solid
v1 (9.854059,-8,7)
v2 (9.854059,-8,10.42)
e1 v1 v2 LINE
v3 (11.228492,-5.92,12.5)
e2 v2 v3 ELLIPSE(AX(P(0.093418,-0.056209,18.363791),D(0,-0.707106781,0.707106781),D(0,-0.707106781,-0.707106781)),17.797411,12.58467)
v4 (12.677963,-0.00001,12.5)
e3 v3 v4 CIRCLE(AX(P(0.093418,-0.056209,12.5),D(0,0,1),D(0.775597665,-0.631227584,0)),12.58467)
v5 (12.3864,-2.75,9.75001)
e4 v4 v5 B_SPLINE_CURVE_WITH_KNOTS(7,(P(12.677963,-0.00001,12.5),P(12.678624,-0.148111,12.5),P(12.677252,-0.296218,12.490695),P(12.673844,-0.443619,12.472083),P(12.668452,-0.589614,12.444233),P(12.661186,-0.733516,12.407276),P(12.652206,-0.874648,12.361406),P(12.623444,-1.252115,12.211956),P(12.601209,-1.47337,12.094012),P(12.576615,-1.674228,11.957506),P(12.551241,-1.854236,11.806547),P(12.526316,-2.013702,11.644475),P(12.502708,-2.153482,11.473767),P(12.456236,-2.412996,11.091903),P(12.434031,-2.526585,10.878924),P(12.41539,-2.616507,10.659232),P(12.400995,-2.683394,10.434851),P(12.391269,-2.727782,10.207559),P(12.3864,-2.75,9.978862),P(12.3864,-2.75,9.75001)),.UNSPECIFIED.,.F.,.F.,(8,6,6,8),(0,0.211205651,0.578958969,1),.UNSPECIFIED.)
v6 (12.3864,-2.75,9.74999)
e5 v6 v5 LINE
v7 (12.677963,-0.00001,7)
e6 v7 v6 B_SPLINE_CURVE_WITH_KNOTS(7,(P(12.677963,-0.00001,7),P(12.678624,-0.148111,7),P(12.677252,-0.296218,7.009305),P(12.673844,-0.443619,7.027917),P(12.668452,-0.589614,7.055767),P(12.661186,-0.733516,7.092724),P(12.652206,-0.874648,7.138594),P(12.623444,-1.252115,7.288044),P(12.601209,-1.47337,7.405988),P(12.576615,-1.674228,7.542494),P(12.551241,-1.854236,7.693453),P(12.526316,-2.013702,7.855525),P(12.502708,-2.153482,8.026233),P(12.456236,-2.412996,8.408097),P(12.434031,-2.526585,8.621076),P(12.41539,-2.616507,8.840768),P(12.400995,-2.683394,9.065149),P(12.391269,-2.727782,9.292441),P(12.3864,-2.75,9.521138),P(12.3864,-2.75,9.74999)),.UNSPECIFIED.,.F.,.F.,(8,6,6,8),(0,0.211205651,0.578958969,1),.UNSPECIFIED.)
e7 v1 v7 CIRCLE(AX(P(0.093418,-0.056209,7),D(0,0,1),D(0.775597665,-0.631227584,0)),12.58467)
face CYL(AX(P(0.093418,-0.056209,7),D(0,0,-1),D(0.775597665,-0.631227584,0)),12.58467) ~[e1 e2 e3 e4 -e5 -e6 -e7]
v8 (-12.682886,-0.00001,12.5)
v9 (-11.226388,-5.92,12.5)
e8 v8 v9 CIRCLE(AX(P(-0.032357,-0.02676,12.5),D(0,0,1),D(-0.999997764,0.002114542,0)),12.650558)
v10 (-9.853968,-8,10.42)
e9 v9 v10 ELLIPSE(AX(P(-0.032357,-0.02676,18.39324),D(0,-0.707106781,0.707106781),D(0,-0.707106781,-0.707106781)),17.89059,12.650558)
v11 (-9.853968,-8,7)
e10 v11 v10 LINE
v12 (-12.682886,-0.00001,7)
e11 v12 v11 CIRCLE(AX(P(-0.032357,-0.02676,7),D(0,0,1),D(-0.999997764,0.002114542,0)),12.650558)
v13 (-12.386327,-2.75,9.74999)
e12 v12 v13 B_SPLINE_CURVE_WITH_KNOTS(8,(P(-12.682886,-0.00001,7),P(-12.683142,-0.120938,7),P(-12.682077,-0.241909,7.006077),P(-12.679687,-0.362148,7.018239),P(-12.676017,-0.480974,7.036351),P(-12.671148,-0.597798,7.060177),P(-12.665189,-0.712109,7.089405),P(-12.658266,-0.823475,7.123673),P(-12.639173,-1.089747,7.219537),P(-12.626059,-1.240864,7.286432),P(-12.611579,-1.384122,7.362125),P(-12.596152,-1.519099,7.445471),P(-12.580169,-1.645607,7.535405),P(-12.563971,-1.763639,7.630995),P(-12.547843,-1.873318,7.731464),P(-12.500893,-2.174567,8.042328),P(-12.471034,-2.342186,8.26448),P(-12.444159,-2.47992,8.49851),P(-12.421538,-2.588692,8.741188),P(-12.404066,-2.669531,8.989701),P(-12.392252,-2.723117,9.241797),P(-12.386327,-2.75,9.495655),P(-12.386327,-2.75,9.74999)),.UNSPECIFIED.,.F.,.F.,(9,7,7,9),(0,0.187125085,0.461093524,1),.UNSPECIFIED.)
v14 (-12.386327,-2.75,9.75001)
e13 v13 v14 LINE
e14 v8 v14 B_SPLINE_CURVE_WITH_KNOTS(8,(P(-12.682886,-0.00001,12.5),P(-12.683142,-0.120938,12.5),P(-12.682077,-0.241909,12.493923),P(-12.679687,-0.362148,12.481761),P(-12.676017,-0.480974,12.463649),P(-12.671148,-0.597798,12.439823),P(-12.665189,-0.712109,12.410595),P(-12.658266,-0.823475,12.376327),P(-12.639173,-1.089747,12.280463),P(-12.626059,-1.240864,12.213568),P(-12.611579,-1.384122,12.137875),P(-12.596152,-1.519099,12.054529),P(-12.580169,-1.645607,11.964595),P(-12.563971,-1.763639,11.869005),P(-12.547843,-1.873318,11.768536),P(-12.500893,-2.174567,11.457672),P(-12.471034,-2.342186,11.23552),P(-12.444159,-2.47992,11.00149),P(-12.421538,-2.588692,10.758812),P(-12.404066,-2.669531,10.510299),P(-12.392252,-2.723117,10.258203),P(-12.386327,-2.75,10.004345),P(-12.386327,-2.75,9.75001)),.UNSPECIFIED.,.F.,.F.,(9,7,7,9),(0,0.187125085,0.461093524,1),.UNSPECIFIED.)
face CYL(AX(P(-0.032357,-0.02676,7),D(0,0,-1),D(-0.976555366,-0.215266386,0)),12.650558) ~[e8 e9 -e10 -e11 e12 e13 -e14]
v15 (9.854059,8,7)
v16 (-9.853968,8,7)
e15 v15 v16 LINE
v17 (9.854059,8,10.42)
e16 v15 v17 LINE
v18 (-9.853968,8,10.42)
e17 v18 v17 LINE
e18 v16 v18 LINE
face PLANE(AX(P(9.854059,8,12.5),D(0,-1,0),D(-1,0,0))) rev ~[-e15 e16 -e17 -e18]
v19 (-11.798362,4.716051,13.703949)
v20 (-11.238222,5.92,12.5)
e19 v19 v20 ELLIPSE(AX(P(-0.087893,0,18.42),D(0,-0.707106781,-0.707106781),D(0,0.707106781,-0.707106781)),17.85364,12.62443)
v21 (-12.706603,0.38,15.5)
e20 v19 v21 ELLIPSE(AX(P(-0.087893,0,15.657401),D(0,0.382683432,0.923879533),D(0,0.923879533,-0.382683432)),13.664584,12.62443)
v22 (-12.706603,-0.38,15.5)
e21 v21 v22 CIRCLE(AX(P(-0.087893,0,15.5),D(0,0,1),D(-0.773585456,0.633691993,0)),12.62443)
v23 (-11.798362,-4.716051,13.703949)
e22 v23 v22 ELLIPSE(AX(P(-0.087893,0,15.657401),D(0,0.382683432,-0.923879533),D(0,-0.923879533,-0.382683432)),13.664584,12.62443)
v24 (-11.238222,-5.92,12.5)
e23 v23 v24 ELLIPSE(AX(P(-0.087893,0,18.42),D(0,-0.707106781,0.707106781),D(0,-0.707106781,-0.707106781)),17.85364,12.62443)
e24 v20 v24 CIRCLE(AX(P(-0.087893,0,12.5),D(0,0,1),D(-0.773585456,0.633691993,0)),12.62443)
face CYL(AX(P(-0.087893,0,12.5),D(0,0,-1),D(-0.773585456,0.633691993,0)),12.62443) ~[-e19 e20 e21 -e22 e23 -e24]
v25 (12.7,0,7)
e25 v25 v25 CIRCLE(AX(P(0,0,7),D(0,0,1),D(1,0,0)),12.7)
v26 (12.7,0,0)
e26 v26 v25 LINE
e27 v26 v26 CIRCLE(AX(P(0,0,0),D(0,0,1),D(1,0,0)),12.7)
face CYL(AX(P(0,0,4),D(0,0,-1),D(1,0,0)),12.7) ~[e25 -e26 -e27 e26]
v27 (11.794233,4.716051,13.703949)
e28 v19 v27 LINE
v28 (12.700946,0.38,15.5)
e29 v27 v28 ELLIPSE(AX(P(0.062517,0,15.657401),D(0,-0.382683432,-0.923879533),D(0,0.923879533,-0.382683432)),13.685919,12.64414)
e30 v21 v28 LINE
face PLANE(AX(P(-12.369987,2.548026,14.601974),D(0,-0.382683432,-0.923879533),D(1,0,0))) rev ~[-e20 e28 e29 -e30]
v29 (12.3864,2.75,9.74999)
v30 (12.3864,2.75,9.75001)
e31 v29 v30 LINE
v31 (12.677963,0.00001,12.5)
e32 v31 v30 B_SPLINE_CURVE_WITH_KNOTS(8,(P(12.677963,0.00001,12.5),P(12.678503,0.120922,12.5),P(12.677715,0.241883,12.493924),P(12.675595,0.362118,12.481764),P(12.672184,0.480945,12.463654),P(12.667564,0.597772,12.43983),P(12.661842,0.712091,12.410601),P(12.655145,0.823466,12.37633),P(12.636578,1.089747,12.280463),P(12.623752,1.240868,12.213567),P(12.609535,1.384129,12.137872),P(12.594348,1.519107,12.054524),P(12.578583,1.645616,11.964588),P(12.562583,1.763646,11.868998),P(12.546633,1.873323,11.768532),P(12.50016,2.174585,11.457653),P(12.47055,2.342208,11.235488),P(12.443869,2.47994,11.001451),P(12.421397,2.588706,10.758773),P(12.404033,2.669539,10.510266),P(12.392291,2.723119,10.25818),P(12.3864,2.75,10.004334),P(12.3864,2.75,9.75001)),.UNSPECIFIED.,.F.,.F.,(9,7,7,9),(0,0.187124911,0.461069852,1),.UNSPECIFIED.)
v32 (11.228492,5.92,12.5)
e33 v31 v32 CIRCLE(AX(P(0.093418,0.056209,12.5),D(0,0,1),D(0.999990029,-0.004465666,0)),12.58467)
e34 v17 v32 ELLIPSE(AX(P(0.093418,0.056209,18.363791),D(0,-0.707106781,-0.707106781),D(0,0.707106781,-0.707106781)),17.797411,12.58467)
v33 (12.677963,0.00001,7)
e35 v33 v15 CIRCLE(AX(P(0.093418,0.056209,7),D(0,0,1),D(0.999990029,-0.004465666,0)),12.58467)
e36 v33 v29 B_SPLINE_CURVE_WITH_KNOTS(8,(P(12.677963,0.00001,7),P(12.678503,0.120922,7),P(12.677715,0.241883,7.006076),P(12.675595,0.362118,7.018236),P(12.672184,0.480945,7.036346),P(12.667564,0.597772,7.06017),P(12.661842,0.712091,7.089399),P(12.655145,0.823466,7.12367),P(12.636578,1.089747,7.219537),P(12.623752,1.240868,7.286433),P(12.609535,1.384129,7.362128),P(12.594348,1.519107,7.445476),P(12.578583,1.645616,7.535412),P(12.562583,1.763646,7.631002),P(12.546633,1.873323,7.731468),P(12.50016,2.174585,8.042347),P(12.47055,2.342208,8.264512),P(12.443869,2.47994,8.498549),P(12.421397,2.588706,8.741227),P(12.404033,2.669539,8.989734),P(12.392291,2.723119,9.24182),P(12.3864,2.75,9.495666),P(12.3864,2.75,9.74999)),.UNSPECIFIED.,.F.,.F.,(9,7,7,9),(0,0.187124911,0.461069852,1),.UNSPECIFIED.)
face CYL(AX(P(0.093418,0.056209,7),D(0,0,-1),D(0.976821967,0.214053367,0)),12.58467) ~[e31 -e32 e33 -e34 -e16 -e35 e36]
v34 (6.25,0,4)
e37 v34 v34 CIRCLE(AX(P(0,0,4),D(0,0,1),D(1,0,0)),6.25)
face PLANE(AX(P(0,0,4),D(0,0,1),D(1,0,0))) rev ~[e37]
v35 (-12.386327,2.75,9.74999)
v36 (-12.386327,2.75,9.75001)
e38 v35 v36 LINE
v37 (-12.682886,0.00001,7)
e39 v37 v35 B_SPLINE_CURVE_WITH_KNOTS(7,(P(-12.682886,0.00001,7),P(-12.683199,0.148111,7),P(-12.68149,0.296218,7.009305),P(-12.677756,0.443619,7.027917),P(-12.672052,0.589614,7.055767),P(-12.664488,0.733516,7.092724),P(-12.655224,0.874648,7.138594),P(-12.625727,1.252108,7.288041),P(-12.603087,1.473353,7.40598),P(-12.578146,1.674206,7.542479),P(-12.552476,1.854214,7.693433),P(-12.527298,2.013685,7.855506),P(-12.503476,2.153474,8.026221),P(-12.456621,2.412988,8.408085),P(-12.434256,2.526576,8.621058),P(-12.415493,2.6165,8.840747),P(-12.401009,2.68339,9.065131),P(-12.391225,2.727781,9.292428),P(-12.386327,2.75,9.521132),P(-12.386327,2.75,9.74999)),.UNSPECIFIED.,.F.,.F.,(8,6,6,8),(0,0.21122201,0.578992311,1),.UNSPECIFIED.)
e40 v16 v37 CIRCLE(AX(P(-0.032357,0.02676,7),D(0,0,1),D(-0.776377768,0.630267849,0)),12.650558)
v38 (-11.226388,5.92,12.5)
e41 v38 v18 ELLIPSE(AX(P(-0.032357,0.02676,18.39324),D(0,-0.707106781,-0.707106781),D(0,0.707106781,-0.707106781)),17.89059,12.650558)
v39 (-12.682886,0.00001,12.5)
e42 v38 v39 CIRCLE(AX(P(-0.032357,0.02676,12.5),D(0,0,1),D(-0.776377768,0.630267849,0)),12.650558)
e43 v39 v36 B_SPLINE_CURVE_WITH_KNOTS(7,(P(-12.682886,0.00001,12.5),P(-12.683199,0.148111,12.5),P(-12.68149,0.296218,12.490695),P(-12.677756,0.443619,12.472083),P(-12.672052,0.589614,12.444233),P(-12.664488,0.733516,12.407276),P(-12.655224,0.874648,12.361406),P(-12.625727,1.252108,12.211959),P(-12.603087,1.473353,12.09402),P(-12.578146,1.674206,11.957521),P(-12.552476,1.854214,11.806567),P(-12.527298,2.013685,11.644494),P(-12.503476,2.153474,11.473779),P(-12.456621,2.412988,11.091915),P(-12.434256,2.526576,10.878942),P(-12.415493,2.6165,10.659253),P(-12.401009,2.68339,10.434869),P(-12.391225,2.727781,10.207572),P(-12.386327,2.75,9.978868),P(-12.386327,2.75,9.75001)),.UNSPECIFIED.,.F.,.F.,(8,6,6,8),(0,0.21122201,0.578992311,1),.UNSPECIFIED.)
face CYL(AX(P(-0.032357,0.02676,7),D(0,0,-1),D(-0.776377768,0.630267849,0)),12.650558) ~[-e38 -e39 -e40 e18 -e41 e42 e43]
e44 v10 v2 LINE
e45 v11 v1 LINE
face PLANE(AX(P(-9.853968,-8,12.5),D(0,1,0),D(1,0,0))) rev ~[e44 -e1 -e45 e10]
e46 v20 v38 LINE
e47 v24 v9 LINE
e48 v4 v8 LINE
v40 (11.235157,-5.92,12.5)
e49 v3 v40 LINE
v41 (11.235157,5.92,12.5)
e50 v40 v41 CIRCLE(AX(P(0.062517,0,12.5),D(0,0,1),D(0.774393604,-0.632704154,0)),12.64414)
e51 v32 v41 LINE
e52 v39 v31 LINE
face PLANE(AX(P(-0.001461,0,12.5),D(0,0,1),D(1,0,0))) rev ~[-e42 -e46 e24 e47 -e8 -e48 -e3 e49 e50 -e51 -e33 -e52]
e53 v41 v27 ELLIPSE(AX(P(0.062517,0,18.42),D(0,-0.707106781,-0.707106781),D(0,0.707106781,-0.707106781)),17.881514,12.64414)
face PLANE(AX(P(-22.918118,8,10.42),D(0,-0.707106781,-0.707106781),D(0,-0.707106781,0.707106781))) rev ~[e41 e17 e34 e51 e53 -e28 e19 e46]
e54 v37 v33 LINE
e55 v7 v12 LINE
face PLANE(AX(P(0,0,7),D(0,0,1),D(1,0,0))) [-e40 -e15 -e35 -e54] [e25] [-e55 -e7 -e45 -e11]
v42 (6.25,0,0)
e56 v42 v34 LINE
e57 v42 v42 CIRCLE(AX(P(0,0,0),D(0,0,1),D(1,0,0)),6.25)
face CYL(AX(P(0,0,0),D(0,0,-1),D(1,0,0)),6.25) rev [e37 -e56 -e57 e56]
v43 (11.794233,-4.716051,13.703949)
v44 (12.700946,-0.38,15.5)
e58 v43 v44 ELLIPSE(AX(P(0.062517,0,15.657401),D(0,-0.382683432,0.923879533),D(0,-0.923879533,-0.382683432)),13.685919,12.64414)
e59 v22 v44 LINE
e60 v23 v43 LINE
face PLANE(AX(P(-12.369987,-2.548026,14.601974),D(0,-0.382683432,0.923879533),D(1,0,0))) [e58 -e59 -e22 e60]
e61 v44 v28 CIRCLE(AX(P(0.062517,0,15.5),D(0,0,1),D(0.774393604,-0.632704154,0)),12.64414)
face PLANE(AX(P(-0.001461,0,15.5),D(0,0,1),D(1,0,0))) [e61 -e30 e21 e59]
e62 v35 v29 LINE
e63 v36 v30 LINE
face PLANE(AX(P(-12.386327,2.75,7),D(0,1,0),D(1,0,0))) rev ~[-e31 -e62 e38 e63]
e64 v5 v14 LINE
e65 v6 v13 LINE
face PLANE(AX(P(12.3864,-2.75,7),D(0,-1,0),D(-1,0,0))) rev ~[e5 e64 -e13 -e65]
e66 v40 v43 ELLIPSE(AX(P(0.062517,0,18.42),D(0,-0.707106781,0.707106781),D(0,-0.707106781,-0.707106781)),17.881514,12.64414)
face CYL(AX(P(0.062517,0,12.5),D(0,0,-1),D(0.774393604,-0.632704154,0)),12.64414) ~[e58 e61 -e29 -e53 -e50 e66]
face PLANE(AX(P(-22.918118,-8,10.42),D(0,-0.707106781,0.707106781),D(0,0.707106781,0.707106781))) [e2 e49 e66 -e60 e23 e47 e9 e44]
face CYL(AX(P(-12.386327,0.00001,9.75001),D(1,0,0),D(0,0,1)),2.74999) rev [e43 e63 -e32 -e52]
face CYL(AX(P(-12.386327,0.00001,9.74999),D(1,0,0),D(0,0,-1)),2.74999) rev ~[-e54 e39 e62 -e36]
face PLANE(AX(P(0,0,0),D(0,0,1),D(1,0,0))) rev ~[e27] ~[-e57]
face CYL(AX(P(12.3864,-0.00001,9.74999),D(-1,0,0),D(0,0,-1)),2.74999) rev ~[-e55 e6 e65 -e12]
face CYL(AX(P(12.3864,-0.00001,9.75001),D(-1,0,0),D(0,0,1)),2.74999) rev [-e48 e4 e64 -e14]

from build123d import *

# Parameters (mm, degrees)
F0_R         = 12.7
F0_R_2       = 6.25
F1_DEPTH     = 4
F3_R         = 12.7
F4_DEPTH     = 3
F7_DEPTH     = 5.5
F10_DEPTH    = 3
F11_R        = 2.74999
F12_T1_DEPTH = 45.8363262896
F13_SIZE     = 2.54


# Not quite as in the source:
# - a fillet or chamfer that OpenCascade refuses, or shapes differently, is made with other operations: its cross-section is extruded or revolved along the edge and cut away or added
# - a fillet or chamfer is up to 0.001 mm smaller than in the source, because OpenCascade refuses the exact size


with BuildPart() as f1:
    # F0 (on Top) → F1 (new body)
    with BuildSketch(Plane.XY):
        Circle(F0_R)
        Circle(F0_R_2, mode=Mode.SUBTRACT)
    extrude(amount=F1_DEPTH)

    # F3 (on offset) → F4 (join)
    with BuildSketch(Plane.XY.offset(4)):
        Circle(F3_R)
    extrude(amount=F4_DEPTH)

    # F6 (on offset) → F7 (join)
    with BuildSketch(Plane.XY.offset(7)):
        with BuildLine():
            Line((3.67872e-05, 2.75), (12.3864002526, 2.75))
            ThreePointArc((12.3864002526, 2.75), (11.4283726358, 5.5236330803), (9.8540587351, 8))
            Line((9.8540587351, 8), (-9.8539683968, 8))
            ThreePointArc((-9.8539683968, 8), (-11.4266416959, 5.5228386705), (-12.3863266781, 2.75))
            Line((-12.3863266781, 2.75), (-4.0361126885, 2.75))
            Line((-4.0361126885, 2.75), (3.67872e-05, 2.75))
        make_face()
        with BuildLine():
            Line((12.3864002526, -2.75), (3.67872e-05, -2.75))
            Line((3.67872e-05, -2.75), (-4.0361126885, -2.75))
            Line((-4.0361126885, -2.75), (-12.3863266781, -2.75))
            ThreePointArc((-12.3863266781, -2.75), (-11.4266416959, -5.5228386705), (-9.8539683968, -8))
            Line((-9.8539683968, -8), (9.8540587351, -8))
            ThreePointArc((9.8540587351, -8), (11.4283726358, -5.5236330803), (12.3864002526, -2.75))
        make_face()
    extrude(amount=F7_DEPTH)

    # F9 (on offset) → F10 (join)
    with BuildSketch(Plane.XY.offset(12.5)):
        with BuildLine():
            Line((-9.8539683968, -8), (9.8540587351, -8))
            ThreePointArc((9.8540587351, -8), (12.7066576307, 0), (9.8540587351, 8))
            Line((9.8540587351, 8), (-9.8539683968, 8))
            ThreePointArc((-9.8539683968, 8), (-12.7123228833, 0), (-9.8539683968, -8))
        make_face()
    extrude(amount=F10_DEPTH)

    # F11 (radius 2.75 in the source; OpenCascade refuses exactly that, so slightly less here)
    f11_edges = [f1.edges().sort_by_distance(p)[0] for p in [
        (3.7e-05, -2.75, 7),
        (3.7e-05, -2.75, 12.5),
        (3.7e-05, 2.75, 12.5),
        (3.7e-05, 2.75, 7),
    ]]
    fillet(f11_edges, radius=F11_R)

    # F12: chamfer of 5.08 on 2 edges, made by hand

    # F12_s2 → F12_t1 (cut)
    with BuildSketch(Plane.YZ.offset(-22.9181179756)):
        Polygon((8, 10.42), (2.92, 15.5), (8, 15.5), align=None)
        Polygon((-8, 10.42), (-2.92, 15.5), (-8, 15.5), align=None)
    extrude(amount=F12_T1_DEPTH, mode=Mode.SUBTRACT)

    # F13
    f13_edges = [f1.edges().sort_by_distance(p)[0] for p in [
        (-0.002558, 2.92, 15.5),
        (-0.002558, -2.92, 15.5),
    ]]
    chamfer(f13_edges, length=F13_SIZE)


solid = f1.part
